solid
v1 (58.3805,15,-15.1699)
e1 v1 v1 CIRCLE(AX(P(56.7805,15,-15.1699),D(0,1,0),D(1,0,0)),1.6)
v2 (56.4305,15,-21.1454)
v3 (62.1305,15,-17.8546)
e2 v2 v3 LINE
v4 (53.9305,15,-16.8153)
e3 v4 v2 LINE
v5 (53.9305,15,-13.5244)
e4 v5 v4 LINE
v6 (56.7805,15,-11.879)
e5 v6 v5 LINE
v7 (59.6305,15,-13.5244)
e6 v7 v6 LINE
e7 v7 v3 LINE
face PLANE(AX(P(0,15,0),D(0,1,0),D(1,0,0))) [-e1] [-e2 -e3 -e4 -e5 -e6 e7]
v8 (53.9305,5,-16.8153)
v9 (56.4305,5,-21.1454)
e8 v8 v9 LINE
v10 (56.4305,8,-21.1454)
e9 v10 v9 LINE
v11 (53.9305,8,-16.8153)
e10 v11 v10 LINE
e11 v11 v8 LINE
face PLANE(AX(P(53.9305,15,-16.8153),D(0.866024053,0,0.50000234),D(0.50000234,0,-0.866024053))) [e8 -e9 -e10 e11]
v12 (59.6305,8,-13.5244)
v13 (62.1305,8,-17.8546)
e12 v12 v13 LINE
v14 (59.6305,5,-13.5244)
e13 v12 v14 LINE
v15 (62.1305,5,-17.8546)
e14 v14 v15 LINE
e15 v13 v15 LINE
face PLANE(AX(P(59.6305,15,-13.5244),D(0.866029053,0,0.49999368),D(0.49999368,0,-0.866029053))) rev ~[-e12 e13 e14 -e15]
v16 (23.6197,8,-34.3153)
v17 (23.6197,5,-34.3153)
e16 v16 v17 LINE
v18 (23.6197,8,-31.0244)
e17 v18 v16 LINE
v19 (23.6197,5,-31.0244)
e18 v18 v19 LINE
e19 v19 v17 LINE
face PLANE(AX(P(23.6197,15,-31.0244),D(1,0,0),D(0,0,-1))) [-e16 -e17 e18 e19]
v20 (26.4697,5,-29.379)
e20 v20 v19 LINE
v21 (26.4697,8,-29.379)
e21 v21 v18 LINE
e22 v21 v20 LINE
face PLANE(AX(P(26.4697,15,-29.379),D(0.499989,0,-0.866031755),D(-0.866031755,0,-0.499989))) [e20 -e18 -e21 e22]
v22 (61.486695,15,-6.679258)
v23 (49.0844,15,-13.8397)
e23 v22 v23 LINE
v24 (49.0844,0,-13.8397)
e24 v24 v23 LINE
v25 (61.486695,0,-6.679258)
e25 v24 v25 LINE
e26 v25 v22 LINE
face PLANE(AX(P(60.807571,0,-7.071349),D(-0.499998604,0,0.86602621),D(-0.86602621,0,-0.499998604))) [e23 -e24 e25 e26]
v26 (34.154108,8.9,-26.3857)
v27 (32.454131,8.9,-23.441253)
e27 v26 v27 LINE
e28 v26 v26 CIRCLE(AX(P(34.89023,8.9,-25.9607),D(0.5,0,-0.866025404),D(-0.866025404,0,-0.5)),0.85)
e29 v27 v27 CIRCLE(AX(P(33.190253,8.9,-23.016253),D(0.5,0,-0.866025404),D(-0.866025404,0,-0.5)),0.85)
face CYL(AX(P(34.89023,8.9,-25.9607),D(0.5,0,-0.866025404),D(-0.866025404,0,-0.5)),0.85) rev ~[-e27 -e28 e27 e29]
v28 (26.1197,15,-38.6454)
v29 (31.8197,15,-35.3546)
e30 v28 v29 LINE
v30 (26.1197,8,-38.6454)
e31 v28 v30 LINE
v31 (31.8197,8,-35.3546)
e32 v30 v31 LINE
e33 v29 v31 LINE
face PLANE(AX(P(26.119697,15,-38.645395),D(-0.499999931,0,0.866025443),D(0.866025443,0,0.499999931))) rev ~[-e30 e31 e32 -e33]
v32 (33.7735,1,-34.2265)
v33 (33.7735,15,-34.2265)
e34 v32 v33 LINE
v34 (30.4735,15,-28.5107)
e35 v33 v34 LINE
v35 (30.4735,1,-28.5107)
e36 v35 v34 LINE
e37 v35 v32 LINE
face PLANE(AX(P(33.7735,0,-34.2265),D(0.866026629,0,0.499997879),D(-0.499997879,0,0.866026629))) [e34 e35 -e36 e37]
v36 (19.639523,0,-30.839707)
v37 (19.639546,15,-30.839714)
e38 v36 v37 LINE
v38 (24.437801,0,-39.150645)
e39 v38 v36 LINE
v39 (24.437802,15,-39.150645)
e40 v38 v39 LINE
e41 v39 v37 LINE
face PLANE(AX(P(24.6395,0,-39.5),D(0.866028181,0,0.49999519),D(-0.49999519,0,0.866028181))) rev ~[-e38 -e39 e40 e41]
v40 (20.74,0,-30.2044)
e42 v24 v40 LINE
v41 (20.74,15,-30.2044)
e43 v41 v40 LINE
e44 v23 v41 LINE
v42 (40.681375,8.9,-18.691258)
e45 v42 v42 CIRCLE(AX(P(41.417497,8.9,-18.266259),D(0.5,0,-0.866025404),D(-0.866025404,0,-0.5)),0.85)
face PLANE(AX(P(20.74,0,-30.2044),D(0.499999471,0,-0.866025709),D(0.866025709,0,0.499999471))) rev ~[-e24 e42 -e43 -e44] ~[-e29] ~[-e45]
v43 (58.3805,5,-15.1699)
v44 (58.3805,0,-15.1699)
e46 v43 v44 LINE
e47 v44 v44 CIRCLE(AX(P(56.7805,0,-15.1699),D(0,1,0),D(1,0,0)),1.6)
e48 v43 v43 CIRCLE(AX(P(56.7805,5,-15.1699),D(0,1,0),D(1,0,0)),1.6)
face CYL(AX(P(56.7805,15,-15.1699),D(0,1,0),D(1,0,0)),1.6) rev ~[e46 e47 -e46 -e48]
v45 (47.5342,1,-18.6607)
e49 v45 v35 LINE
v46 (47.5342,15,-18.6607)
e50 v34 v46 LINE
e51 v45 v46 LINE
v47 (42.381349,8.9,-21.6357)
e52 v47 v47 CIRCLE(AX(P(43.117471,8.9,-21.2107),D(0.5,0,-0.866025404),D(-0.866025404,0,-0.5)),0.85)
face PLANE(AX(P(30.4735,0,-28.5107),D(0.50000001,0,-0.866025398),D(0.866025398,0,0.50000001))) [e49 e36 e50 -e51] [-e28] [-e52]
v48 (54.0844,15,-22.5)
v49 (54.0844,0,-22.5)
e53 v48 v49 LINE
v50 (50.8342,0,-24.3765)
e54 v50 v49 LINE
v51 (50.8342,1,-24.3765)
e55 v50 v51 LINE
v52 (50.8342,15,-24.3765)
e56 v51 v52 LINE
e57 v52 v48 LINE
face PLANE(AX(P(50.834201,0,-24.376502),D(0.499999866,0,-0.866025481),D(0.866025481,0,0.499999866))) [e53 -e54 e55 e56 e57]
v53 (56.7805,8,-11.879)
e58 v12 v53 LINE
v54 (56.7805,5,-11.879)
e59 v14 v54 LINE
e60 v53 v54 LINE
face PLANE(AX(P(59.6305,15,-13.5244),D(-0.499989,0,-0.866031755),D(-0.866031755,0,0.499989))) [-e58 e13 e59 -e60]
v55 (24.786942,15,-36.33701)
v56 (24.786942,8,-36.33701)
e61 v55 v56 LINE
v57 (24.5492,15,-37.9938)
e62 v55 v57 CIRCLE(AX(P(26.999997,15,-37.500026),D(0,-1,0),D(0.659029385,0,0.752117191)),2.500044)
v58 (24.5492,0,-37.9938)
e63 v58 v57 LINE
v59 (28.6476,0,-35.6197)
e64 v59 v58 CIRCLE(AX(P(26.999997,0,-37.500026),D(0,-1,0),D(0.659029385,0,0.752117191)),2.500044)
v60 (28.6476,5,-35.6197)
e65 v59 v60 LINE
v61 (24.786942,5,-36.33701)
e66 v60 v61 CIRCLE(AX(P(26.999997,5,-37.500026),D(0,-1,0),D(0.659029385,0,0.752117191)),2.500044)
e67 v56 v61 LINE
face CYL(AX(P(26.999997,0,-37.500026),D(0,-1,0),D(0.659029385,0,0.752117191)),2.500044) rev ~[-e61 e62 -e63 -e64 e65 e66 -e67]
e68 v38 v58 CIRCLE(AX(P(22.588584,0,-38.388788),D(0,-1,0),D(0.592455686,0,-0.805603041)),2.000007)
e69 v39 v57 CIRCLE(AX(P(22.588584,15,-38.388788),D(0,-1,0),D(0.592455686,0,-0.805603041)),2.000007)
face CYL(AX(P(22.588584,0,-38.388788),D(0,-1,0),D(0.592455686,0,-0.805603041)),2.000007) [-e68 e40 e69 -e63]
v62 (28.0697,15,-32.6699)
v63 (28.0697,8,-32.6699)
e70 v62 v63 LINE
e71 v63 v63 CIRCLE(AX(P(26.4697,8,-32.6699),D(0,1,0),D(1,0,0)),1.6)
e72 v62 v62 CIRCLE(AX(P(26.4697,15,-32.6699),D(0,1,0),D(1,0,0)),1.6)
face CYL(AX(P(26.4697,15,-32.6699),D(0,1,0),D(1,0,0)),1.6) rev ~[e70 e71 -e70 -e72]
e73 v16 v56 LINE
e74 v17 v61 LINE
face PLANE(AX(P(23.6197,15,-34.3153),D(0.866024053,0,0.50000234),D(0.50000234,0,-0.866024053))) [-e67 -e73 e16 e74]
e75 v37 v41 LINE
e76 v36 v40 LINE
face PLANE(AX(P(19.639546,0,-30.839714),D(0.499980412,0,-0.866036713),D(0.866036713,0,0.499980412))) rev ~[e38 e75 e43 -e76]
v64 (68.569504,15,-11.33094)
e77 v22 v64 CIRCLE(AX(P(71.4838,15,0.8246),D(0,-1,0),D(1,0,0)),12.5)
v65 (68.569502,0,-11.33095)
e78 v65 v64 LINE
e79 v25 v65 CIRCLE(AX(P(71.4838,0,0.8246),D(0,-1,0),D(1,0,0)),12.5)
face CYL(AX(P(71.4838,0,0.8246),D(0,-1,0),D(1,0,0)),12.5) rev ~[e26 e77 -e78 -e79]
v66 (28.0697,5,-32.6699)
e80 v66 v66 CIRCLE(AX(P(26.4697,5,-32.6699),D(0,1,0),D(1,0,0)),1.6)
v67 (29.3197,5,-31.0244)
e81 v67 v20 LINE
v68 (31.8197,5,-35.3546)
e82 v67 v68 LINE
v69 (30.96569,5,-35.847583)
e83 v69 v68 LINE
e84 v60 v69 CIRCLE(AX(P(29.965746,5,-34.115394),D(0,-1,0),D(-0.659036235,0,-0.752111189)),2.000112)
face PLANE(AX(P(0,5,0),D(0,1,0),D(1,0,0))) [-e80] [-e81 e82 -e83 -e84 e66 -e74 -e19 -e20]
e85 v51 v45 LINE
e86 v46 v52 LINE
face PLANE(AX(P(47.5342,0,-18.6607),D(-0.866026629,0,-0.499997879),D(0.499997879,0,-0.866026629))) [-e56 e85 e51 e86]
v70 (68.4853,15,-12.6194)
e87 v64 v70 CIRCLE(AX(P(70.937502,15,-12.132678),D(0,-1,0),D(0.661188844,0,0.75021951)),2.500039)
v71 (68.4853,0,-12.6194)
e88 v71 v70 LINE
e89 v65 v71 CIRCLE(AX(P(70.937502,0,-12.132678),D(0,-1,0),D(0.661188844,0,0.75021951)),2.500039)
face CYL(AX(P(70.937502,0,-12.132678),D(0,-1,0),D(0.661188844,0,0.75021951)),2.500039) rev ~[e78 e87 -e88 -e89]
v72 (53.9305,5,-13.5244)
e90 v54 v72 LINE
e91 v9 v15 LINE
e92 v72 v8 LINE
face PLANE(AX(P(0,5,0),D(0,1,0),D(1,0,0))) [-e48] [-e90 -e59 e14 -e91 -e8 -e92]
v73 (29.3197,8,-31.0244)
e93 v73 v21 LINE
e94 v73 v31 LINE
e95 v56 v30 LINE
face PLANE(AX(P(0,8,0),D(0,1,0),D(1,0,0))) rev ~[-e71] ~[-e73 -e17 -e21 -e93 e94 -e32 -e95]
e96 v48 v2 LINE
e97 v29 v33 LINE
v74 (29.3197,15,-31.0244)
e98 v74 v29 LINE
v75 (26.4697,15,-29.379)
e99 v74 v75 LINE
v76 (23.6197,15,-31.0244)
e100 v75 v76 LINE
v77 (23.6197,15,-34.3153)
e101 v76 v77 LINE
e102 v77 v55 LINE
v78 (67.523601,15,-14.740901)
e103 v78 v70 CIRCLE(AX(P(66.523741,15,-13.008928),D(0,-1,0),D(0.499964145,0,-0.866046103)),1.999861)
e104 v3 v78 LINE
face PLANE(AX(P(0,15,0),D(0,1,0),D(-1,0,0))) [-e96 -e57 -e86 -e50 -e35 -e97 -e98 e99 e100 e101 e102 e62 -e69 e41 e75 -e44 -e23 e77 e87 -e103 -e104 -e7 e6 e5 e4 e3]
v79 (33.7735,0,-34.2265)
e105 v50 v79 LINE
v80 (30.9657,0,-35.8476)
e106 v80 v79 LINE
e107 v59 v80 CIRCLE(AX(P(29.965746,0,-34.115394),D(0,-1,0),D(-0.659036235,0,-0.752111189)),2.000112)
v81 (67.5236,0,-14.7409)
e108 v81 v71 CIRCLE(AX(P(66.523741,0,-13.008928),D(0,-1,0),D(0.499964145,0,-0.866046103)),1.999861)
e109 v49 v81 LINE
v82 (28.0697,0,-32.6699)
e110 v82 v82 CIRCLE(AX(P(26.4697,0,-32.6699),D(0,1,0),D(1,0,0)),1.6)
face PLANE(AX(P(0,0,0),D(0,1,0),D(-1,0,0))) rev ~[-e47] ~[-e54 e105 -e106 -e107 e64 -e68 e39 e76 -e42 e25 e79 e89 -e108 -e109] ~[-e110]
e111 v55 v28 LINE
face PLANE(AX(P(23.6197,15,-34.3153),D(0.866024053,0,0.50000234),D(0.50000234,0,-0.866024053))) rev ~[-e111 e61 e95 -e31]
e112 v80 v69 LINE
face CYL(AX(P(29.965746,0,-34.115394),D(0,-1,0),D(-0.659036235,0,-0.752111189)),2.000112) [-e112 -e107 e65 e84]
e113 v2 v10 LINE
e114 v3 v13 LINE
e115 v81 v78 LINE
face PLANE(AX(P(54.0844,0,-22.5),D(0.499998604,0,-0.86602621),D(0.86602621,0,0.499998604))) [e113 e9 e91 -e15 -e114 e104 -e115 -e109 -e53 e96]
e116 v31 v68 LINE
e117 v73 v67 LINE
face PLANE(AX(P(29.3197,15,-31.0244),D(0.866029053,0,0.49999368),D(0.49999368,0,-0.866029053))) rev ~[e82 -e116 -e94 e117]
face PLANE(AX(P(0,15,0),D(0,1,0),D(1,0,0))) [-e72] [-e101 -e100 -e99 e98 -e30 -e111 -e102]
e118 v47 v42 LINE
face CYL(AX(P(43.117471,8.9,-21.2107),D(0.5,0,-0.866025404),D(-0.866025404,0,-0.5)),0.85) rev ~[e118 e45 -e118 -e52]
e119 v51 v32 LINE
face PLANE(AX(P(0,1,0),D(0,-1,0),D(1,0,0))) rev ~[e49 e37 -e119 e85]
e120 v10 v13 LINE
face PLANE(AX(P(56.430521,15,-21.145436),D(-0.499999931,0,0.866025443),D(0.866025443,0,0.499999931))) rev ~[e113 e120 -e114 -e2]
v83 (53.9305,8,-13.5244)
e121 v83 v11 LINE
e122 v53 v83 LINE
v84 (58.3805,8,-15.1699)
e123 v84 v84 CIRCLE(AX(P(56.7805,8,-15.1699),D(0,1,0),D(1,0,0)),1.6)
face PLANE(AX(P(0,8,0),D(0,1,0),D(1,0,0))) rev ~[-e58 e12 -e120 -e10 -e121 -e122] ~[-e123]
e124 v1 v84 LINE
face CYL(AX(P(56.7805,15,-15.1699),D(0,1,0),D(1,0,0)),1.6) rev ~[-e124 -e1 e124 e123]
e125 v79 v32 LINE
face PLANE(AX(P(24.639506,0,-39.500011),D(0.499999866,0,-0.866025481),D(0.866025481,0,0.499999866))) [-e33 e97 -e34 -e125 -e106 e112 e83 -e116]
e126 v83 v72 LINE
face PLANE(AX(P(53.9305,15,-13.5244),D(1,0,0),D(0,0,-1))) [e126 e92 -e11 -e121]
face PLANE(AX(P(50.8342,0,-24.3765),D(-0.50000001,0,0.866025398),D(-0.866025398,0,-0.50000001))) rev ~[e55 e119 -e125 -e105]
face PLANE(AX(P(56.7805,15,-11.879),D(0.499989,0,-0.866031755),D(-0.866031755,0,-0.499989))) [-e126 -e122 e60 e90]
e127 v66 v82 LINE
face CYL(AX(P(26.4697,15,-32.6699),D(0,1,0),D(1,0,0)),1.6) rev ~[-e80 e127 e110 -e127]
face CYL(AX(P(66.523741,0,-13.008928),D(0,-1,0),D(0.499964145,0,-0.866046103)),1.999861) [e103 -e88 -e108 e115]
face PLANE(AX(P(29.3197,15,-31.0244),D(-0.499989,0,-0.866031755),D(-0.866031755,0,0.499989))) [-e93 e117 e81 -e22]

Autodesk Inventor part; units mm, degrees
ref_plane "YZ Plane" through (0, 0, 0) normal (1, 0, 0) x (0, 1, 0)
ref_plane "XZ Plane" through (0, 0, 0) normal (0, 1, 0) x (-1, 0, 0)
ref_plane "XY Plane" through (0, 0, 0) normal (0, 0, 1) x (1, 0, 0)
sketch "スケッチ1" plane through (0, 0, 0) normal (0, 1, 0) x (-1, 0, 0)
  line L0 (0, 0) -> (0, -40)
  line L1 (0, -40) -> (-23.7735, -40)
  line L2 (-23.7735, -40) -> (-54.0844, -22.5)
  line L3 (0, -30) -> (-18, -30)
  line L4 (-18, -30) -> (-38, -18.453)
  line L5 (-28, -24.2265) -> (-28, 11.9512)
  line L6 (-18, -30) -> (-23.7735, -40)
  line L7 (-18.7735, -31.3397) -> (-20.74, -30.2044)
  line L8 (-20.74, -30.2044) -> (-58.951, -8.1433)
  line L9 (-33.7735, -34.2265) -> (-30.4735, -28.5107)
  line L10 (-30.4735, -28.5107) -> (-47.5342, -18.6607)
  line L11 (-47.5342, -18.6607) -> (-50.8342, -24.3765)
  line L12 (-50.8342, -24.3765) -> (-33.7735, -34.2265)
  line L13 (-30.4735, -28.5107) -> (-28, -24.2265)
  line L14 (-24.6395, -39.5) -> (-19.5508, -30.686)
  line L15 (-54.0844, -22.5) -> (-49.0844, -13.8397)
  point P0 (-19.6395, -30.8397)
  dimension "d0" = 40
  dimension "d1" = 30
  dimension "d2" = 18
  dimension "d3" = 30
  dimension "d4" = 38
  dimension "d5" = 10
  dimension "d6" = 10
  dimension "d7" = 19.7
  dimension "d8" = 6.6
  dimension "d9" = 1
  dimension "d10" = 35
extrude "押し出し1" add sketch "スケッチ1" along normal blind 15 contours L2 L9 L13 L8 L7 L14 | L13 L10 L11 L2 L15 L8
sketch "スケッチ2" plane through (0, 0, 0) normal (0, -1, 0) x (1, 0, 0)
  line L0 (30.4735, -28.5107) -> (33.7735, -34.2265) projected
  line L1 (47.5342, -18.6607) -> (30.4735, -28.5107) projected
  line L2 (50.8342, -24.3765) -> (47.5342, -18.6607) projected
  line L3 (54.0844, -22.5) -> (50.8342, -24.3765) projected
  line L4 (49.0844, -13.8397) -> (54.0844, -22.5) projected
  line L5 (19.6395, -30.8397) -> (49.0844, -13.8397) projected
  line L6 (24.6395, -39.5) -> (19.6395, -30.8397) projected
  line L7 (33.7735, -34.2265) -> (24.6395, -39.5) projected
  line L8 (50.8342, -24.3765) -> (33.7735, -34.2265)
  point P0 (0, 0)
extrude "押し出し2" add sketch "スケッチ2" against normal blind 1
sketch "スケッチ3" plane through (30.4735, 1, -28.5107) normal (0.5, 0, -0.8660254) x (-0.8660254, 0, -0.5)
  line L0 (-19.7, 0) -> (0, 0) projected
  line L1 (-19.7, 14) -> (0, 14) projected
  line L2 (-9.85, 14) -> (-9.85, 0)
  line L3 (-19.7, 0) -> (0, 0) projected
  circle A0 centre (-14.6, 7.9) radius 0.85
  circle A1 centre (-5.1, 7.9) radius 0.85
  point P0 (12.1355, -1)
  dimension "d16" = 1.7
  dimension "d17" = 9.5
  dimension "d18" = 7.9
extrude "押し出し3" cut sketch "スケッチ3" against normal through all
sketch "スケッチ4" plane through (0, 0, 0) normal (0, -1, 0) x (1, 0, 0)
  circle A0 centre (50.5, 0) radius 1.35 projected
  circle A1 centre (50.5, 0) radius 12.5
  line L0 (49.0844, -13.8397) -> (54.0844, -22.5) projected
  line L1 (49.0844, -13.8397) -> (54.0844, -22.5)
  line L2 (54.0844, -22.5) -> (74.7158, -10.5885)
  line L3 (74.7158, -10.5885) -> (69.7158, -1.9282)
  line L4 (69.7158, -1.9282) -> (49.0844, -13.8397)
  line L5 (74.7158, -10.5885) -> (86.6025, 10) projected
  circle A2 centre (71.4838, 0.8246) radius 1.5 projected
  circle A3 centre (71.4838, 0.8246) radius 12.5
  point P0 (0, 0)
  point P1 (60.8076, -7.0714)
  point P2 (51.4702, -12.4623)
  point P3 (72.3273, -6.4515)
  point P4 (61.4867, -6.6793)
  point P5 (72.9912, -11.5842)
  dimension "d21" = 25
  dimension "d24" = 25
extrude "押し出し4" add sketch "スケッチ4" against normal up to surface (15 mm away) contours L4 A1 | A1 L4 A3 L2 L0
sketch "スケッチ5" plane through (0, 15, 0) normal (0, 1, 0) x (1, 0, 0)
  line L0 (56.7805, 18.4608) -> (59.6305, 16.8153)
  line L1 (59.6305, 16.8153) -> (59.6305, 13.5244)
  line L2 (59.6305, 13.5244) -> (56.7805, 11.879)
  line L3 (56.7805, 11.879) -> (53.9305, 13.5244)
  line L4 (53.9305, 13.5244) -> (53.9305, 16.8153)
  line L5 (53.9305, 16.8153) -> (56.7805, 18.4608)
  line L6 (26.4697, 35.9608) -> (29.3197, 34.3153)
  line L7 (29.3197, 34.3153) -> (29.3197, 31.0244)
  line L8 (29.3197, 31.0244) -> (26.4697, 29.379)
  line L9 (26.4697, 29.379) -> (23.6197, 31.0244)
  line L10 (23.6197, 31.0244) -> (23.6197, 34.3153)
  line L11 (23.6197, 34.3153) -> (26.4697, 35.9608)
  line L12 (19.6395, 30.8397) -> (61.4867, 6.6793) projected
  line L13 (24.6395, 39.5) -> (19.6395, 30.8397) projected
  circle A0 centre (56.7805, 15.1699) radius 1.6
  circle A1 centre (26.4697, 32.6699) radius 1.6
  line L14 (23.8895, 39.933) -> (74.5998, 10.6554)
  line L15 (59.6305, 13.5244) -> (62.1305, 17.8546)
  line L16 (53.9305, 16.8153) -> (56.4305, 21.1454)
  line L17 (29.3197, 31.0244) -> (31.8197, 35.3546)
  line L18 (23.6197, 34.3153) -> (26.1197, 38.6454)
  point P0 (0, 0)
  dimension "d25" = 5.7
  dimension "d26" = 5
  dimension "d27" = 5
  dimension "d28" = 40
  dimension "d29" = 3.2
extrude "押し出し5" cut sketch "スケッチ5" against normal blind 10 contours L5 L16 L14 L15 L1 L0 | L0 L1 L2 L3 L4 L5 | L11 L18 L14 L17 L7 L6 | L6 L7 L8 L9 L10 L11 | A0 | A1
extrude "押し出し6" cut sketch "スケッチ5" against normal through all contours A0 | A1
sketch "スケッチ6" plane through (0, 0, 0) normal (0, -1, 0) x (1, 0, 0)
  arc A0 (28.6476, -35.6197) -> (24.5492, -37.9938) centre (27, -37.5) ccw projected
  arc A1 (23.7735, -40) -> (24.5492, -37.9938) centre (22.5886, -38.3888) ccw projected
  arc A2 (28.6476, -35.6197) -> (30.9657, -35.8476) centre (29.9657, -34.1155) ccw projected
  arc A3 (72.5905, -10.2571) -> (68.4853, -12.6194) centre (70.9375, -12.1327) ccw projected
  arc A4 (67.5236, -14.7409) -> (68.4853, -12.6194) centre (66.5236, -13.0088) ccw projected
  circle A5 centre (26.4697, -32.6699) radius 1.6 projected
  circle A6 centre (56.7805, -15.1699) radius 1.6 projected
  line L0 (24.6395, -39.5) -> (72.9912, -11.5842) projected
  arc A7 (61.4867, -6.6793) -> (72.9912, -11.5842) centre (71.4838, 0.8246) ccw projected
  line L1 (19.6395, -30.8397) -> (61.4867, -6.6793) projected
  line L2 (24.6395, -39.5) -> (19.6395, -30.8397) projected
  point P0 (0, 0)
  point P1 (24.4378, -39.1507)
  point P2 (68.5695, -11.3309)
extrude "押し出し7" cut sketch "スケッチ6" against normal through all contours A2 L0 L2 A1 A0 | A4 A3 A7 L0
extrude "押し出し8" add sketch "スケッチ5" against normal blind 7
properties part number "limit_setter_under"
